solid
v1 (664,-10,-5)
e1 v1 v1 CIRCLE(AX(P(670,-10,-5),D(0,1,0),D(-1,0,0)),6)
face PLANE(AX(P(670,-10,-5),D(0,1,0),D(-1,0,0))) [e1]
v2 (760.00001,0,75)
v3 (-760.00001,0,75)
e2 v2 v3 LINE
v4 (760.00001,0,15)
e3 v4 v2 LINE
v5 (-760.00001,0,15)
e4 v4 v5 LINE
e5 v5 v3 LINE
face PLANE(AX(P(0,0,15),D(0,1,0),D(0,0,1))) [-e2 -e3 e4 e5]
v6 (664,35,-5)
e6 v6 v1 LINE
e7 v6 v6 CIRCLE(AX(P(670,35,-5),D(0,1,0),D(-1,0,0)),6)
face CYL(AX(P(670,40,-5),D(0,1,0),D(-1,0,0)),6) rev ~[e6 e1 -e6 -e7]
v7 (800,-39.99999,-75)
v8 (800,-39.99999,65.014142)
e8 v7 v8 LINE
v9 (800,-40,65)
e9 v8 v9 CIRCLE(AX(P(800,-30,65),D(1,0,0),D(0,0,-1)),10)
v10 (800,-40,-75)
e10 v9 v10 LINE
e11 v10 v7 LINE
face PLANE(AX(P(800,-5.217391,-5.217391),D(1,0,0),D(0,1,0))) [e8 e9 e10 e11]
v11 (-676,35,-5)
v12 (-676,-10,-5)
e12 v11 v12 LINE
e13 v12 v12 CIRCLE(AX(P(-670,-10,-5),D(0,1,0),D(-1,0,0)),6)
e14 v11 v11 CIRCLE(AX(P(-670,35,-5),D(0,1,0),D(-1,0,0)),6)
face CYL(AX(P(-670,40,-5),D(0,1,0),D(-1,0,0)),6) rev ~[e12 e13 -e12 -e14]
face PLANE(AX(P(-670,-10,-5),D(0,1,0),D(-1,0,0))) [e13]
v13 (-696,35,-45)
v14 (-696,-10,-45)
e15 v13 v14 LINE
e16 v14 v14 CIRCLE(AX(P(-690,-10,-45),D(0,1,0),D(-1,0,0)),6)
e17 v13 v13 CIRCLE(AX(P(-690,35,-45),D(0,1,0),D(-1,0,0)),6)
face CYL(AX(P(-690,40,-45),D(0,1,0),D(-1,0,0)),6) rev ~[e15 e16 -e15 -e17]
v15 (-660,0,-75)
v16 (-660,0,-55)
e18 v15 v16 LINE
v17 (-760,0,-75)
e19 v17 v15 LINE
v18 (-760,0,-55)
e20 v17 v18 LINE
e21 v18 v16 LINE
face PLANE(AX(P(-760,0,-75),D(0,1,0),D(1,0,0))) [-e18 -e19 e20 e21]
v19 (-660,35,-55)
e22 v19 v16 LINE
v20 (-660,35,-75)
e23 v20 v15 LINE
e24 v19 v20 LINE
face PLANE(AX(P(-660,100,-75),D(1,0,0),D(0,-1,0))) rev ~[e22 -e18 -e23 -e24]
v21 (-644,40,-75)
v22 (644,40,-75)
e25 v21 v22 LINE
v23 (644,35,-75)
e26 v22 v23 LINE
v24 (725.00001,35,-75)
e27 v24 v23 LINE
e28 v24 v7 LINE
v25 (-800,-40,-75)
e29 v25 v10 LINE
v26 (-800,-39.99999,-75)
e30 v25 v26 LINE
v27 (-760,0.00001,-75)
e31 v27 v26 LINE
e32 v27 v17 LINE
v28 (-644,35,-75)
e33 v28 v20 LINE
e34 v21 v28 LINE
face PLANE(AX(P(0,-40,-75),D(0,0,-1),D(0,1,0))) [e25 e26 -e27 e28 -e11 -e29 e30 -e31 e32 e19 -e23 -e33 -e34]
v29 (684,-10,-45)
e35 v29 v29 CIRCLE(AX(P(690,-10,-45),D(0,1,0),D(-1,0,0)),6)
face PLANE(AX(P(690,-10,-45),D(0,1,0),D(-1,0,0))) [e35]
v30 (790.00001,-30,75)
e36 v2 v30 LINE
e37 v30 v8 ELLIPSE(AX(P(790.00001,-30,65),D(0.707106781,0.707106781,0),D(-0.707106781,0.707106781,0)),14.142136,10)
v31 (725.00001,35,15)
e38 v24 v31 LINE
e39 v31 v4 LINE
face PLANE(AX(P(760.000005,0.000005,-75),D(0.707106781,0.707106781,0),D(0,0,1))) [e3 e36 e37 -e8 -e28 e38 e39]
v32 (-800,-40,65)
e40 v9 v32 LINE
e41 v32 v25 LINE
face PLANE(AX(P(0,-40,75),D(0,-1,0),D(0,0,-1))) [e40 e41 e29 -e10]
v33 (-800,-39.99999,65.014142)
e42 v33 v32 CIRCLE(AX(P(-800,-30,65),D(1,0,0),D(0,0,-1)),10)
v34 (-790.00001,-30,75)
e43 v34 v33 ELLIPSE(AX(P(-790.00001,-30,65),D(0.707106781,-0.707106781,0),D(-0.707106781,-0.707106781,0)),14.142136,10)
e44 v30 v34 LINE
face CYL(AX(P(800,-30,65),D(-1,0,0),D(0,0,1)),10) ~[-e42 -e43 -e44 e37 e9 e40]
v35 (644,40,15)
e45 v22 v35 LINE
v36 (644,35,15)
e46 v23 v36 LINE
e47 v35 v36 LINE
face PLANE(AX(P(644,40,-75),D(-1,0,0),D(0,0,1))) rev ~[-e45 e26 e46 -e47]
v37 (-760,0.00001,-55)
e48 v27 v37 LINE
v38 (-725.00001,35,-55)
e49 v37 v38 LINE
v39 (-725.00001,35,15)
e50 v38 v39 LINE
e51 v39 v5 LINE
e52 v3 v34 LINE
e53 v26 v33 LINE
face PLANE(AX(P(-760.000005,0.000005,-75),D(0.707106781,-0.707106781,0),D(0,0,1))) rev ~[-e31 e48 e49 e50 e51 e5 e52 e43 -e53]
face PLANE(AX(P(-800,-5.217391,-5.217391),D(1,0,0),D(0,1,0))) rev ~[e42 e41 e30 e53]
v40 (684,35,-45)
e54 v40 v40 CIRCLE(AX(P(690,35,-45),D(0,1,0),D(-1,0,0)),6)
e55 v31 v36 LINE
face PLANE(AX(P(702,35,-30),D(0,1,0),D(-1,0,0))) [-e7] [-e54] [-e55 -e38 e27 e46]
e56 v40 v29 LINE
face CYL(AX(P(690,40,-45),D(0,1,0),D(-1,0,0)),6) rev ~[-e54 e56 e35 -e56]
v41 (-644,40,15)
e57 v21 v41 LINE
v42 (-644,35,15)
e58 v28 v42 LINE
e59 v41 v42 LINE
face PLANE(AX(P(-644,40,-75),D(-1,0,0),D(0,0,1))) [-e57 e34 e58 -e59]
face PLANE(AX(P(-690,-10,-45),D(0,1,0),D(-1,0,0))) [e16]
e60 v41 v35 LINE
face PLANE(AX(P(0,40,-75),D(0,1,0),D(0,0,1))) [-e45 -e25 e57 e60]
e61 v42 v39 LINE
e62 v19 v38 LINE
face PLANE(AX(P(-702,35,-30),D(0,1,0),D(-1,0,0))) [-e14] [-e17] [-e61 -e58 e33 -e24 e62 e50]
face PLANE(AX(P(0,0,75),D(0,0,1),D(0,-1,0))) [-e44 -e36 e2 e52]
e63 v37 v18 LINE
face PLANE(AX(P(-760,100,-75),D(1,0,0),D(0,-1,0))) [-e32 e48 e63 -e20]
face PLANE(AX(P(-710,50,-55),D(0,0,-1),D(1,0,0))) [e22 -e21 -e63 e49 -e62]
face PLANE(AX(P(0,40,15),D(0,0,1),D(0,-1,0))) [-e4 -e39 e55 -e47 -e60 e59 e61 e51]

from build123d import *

# Parameters (mm, degrees)
F3_DEPTH  = 800
F4_SIZE   = 79.99999
F5_R      = 6
F6_DEPTH  = 50
F7_W      = 116
F7_H      = 90
F8_DEPTH  = 5
F9_R      = 10
F10_W     = 100
F10_H     = 100
F11_DEPTH = 20


# Not quite as in the source:
# - a fillet or chamfer is up to 0.001 mm smaller than in the source, because OpenCascade refuses the exact size


with BuildPart() as f3:
    # F2 (on Right) → F3 (new body, symmetric)
    with BuildSketch(Plane.YZ):
        Polygon((-40, 75), (-40, -75), (40, -75), (40, 15), (0, 15), (0, 75), align=None)
    extrude(amount=F3_DEPTH, both=True)

    # F4 (size 80 in the source; OpenCascade refuses exactly that, so slightly less here)
    f4_edges = [f3.edges().sort_by_distance(p)[0] for p in [
        (800, 40, -30),
        (-800, 40, -30),
    ]]
    chamfer(f4_edges, length=F4_SIZE)

    # F5 (on face) → F6 (cut)
    with BuildSketch(Plane(origin=(0, 40, 0), x_dir=(-1, 0, 0), z_dir=(0, 1, 0))):
        with Locations((-690, -45)):
            Circle(F5_R)
        with Locations((-670, -5)):
            Circle(F5_R)
        with Locations((670, -5)):
            Circle(F5_R)
        with Locations((690, -45)):
            Circle(F5_R)
    extrude(amount=-F6_DEPTH, mode=Mode.SUBTRACT)

    # F7 (on face) → F8 (cut)
    with BuildSketch(Plane(origin=(0, 40, 0), x_dir=(-1, 0, 0), z_dir=(0, 1, 0))):
        with Locations((-702, -30)):
            Rectangle(F7_W, F7_H)
        with Locations((702, -30)):
            Rectangle(F7_W, F7_H)
    extrude(amount=-F8_DEPTH, mode=Mode.SUBTRACT)

    # F9
    f9_edges = [f3.edges().sort_by_distance(p)[0] for p in [
        (0, -40, 75),
    ]]
    fillet(f9_edges, radius=F9_R)

    # F10 (on face) → F11 (cut)
    with BuildSketch(Plane(origin=(0, 0, -75), x_dir=(1, 0, 0), z_dir=(0, 0, -1))):
        with Locations((-710, -50)):
            Rectangle(F10_W, F10_H)
    extrude(amount=-F11_DEPTH, mode=Mode.SUBTRACT)


solid = f3.part
